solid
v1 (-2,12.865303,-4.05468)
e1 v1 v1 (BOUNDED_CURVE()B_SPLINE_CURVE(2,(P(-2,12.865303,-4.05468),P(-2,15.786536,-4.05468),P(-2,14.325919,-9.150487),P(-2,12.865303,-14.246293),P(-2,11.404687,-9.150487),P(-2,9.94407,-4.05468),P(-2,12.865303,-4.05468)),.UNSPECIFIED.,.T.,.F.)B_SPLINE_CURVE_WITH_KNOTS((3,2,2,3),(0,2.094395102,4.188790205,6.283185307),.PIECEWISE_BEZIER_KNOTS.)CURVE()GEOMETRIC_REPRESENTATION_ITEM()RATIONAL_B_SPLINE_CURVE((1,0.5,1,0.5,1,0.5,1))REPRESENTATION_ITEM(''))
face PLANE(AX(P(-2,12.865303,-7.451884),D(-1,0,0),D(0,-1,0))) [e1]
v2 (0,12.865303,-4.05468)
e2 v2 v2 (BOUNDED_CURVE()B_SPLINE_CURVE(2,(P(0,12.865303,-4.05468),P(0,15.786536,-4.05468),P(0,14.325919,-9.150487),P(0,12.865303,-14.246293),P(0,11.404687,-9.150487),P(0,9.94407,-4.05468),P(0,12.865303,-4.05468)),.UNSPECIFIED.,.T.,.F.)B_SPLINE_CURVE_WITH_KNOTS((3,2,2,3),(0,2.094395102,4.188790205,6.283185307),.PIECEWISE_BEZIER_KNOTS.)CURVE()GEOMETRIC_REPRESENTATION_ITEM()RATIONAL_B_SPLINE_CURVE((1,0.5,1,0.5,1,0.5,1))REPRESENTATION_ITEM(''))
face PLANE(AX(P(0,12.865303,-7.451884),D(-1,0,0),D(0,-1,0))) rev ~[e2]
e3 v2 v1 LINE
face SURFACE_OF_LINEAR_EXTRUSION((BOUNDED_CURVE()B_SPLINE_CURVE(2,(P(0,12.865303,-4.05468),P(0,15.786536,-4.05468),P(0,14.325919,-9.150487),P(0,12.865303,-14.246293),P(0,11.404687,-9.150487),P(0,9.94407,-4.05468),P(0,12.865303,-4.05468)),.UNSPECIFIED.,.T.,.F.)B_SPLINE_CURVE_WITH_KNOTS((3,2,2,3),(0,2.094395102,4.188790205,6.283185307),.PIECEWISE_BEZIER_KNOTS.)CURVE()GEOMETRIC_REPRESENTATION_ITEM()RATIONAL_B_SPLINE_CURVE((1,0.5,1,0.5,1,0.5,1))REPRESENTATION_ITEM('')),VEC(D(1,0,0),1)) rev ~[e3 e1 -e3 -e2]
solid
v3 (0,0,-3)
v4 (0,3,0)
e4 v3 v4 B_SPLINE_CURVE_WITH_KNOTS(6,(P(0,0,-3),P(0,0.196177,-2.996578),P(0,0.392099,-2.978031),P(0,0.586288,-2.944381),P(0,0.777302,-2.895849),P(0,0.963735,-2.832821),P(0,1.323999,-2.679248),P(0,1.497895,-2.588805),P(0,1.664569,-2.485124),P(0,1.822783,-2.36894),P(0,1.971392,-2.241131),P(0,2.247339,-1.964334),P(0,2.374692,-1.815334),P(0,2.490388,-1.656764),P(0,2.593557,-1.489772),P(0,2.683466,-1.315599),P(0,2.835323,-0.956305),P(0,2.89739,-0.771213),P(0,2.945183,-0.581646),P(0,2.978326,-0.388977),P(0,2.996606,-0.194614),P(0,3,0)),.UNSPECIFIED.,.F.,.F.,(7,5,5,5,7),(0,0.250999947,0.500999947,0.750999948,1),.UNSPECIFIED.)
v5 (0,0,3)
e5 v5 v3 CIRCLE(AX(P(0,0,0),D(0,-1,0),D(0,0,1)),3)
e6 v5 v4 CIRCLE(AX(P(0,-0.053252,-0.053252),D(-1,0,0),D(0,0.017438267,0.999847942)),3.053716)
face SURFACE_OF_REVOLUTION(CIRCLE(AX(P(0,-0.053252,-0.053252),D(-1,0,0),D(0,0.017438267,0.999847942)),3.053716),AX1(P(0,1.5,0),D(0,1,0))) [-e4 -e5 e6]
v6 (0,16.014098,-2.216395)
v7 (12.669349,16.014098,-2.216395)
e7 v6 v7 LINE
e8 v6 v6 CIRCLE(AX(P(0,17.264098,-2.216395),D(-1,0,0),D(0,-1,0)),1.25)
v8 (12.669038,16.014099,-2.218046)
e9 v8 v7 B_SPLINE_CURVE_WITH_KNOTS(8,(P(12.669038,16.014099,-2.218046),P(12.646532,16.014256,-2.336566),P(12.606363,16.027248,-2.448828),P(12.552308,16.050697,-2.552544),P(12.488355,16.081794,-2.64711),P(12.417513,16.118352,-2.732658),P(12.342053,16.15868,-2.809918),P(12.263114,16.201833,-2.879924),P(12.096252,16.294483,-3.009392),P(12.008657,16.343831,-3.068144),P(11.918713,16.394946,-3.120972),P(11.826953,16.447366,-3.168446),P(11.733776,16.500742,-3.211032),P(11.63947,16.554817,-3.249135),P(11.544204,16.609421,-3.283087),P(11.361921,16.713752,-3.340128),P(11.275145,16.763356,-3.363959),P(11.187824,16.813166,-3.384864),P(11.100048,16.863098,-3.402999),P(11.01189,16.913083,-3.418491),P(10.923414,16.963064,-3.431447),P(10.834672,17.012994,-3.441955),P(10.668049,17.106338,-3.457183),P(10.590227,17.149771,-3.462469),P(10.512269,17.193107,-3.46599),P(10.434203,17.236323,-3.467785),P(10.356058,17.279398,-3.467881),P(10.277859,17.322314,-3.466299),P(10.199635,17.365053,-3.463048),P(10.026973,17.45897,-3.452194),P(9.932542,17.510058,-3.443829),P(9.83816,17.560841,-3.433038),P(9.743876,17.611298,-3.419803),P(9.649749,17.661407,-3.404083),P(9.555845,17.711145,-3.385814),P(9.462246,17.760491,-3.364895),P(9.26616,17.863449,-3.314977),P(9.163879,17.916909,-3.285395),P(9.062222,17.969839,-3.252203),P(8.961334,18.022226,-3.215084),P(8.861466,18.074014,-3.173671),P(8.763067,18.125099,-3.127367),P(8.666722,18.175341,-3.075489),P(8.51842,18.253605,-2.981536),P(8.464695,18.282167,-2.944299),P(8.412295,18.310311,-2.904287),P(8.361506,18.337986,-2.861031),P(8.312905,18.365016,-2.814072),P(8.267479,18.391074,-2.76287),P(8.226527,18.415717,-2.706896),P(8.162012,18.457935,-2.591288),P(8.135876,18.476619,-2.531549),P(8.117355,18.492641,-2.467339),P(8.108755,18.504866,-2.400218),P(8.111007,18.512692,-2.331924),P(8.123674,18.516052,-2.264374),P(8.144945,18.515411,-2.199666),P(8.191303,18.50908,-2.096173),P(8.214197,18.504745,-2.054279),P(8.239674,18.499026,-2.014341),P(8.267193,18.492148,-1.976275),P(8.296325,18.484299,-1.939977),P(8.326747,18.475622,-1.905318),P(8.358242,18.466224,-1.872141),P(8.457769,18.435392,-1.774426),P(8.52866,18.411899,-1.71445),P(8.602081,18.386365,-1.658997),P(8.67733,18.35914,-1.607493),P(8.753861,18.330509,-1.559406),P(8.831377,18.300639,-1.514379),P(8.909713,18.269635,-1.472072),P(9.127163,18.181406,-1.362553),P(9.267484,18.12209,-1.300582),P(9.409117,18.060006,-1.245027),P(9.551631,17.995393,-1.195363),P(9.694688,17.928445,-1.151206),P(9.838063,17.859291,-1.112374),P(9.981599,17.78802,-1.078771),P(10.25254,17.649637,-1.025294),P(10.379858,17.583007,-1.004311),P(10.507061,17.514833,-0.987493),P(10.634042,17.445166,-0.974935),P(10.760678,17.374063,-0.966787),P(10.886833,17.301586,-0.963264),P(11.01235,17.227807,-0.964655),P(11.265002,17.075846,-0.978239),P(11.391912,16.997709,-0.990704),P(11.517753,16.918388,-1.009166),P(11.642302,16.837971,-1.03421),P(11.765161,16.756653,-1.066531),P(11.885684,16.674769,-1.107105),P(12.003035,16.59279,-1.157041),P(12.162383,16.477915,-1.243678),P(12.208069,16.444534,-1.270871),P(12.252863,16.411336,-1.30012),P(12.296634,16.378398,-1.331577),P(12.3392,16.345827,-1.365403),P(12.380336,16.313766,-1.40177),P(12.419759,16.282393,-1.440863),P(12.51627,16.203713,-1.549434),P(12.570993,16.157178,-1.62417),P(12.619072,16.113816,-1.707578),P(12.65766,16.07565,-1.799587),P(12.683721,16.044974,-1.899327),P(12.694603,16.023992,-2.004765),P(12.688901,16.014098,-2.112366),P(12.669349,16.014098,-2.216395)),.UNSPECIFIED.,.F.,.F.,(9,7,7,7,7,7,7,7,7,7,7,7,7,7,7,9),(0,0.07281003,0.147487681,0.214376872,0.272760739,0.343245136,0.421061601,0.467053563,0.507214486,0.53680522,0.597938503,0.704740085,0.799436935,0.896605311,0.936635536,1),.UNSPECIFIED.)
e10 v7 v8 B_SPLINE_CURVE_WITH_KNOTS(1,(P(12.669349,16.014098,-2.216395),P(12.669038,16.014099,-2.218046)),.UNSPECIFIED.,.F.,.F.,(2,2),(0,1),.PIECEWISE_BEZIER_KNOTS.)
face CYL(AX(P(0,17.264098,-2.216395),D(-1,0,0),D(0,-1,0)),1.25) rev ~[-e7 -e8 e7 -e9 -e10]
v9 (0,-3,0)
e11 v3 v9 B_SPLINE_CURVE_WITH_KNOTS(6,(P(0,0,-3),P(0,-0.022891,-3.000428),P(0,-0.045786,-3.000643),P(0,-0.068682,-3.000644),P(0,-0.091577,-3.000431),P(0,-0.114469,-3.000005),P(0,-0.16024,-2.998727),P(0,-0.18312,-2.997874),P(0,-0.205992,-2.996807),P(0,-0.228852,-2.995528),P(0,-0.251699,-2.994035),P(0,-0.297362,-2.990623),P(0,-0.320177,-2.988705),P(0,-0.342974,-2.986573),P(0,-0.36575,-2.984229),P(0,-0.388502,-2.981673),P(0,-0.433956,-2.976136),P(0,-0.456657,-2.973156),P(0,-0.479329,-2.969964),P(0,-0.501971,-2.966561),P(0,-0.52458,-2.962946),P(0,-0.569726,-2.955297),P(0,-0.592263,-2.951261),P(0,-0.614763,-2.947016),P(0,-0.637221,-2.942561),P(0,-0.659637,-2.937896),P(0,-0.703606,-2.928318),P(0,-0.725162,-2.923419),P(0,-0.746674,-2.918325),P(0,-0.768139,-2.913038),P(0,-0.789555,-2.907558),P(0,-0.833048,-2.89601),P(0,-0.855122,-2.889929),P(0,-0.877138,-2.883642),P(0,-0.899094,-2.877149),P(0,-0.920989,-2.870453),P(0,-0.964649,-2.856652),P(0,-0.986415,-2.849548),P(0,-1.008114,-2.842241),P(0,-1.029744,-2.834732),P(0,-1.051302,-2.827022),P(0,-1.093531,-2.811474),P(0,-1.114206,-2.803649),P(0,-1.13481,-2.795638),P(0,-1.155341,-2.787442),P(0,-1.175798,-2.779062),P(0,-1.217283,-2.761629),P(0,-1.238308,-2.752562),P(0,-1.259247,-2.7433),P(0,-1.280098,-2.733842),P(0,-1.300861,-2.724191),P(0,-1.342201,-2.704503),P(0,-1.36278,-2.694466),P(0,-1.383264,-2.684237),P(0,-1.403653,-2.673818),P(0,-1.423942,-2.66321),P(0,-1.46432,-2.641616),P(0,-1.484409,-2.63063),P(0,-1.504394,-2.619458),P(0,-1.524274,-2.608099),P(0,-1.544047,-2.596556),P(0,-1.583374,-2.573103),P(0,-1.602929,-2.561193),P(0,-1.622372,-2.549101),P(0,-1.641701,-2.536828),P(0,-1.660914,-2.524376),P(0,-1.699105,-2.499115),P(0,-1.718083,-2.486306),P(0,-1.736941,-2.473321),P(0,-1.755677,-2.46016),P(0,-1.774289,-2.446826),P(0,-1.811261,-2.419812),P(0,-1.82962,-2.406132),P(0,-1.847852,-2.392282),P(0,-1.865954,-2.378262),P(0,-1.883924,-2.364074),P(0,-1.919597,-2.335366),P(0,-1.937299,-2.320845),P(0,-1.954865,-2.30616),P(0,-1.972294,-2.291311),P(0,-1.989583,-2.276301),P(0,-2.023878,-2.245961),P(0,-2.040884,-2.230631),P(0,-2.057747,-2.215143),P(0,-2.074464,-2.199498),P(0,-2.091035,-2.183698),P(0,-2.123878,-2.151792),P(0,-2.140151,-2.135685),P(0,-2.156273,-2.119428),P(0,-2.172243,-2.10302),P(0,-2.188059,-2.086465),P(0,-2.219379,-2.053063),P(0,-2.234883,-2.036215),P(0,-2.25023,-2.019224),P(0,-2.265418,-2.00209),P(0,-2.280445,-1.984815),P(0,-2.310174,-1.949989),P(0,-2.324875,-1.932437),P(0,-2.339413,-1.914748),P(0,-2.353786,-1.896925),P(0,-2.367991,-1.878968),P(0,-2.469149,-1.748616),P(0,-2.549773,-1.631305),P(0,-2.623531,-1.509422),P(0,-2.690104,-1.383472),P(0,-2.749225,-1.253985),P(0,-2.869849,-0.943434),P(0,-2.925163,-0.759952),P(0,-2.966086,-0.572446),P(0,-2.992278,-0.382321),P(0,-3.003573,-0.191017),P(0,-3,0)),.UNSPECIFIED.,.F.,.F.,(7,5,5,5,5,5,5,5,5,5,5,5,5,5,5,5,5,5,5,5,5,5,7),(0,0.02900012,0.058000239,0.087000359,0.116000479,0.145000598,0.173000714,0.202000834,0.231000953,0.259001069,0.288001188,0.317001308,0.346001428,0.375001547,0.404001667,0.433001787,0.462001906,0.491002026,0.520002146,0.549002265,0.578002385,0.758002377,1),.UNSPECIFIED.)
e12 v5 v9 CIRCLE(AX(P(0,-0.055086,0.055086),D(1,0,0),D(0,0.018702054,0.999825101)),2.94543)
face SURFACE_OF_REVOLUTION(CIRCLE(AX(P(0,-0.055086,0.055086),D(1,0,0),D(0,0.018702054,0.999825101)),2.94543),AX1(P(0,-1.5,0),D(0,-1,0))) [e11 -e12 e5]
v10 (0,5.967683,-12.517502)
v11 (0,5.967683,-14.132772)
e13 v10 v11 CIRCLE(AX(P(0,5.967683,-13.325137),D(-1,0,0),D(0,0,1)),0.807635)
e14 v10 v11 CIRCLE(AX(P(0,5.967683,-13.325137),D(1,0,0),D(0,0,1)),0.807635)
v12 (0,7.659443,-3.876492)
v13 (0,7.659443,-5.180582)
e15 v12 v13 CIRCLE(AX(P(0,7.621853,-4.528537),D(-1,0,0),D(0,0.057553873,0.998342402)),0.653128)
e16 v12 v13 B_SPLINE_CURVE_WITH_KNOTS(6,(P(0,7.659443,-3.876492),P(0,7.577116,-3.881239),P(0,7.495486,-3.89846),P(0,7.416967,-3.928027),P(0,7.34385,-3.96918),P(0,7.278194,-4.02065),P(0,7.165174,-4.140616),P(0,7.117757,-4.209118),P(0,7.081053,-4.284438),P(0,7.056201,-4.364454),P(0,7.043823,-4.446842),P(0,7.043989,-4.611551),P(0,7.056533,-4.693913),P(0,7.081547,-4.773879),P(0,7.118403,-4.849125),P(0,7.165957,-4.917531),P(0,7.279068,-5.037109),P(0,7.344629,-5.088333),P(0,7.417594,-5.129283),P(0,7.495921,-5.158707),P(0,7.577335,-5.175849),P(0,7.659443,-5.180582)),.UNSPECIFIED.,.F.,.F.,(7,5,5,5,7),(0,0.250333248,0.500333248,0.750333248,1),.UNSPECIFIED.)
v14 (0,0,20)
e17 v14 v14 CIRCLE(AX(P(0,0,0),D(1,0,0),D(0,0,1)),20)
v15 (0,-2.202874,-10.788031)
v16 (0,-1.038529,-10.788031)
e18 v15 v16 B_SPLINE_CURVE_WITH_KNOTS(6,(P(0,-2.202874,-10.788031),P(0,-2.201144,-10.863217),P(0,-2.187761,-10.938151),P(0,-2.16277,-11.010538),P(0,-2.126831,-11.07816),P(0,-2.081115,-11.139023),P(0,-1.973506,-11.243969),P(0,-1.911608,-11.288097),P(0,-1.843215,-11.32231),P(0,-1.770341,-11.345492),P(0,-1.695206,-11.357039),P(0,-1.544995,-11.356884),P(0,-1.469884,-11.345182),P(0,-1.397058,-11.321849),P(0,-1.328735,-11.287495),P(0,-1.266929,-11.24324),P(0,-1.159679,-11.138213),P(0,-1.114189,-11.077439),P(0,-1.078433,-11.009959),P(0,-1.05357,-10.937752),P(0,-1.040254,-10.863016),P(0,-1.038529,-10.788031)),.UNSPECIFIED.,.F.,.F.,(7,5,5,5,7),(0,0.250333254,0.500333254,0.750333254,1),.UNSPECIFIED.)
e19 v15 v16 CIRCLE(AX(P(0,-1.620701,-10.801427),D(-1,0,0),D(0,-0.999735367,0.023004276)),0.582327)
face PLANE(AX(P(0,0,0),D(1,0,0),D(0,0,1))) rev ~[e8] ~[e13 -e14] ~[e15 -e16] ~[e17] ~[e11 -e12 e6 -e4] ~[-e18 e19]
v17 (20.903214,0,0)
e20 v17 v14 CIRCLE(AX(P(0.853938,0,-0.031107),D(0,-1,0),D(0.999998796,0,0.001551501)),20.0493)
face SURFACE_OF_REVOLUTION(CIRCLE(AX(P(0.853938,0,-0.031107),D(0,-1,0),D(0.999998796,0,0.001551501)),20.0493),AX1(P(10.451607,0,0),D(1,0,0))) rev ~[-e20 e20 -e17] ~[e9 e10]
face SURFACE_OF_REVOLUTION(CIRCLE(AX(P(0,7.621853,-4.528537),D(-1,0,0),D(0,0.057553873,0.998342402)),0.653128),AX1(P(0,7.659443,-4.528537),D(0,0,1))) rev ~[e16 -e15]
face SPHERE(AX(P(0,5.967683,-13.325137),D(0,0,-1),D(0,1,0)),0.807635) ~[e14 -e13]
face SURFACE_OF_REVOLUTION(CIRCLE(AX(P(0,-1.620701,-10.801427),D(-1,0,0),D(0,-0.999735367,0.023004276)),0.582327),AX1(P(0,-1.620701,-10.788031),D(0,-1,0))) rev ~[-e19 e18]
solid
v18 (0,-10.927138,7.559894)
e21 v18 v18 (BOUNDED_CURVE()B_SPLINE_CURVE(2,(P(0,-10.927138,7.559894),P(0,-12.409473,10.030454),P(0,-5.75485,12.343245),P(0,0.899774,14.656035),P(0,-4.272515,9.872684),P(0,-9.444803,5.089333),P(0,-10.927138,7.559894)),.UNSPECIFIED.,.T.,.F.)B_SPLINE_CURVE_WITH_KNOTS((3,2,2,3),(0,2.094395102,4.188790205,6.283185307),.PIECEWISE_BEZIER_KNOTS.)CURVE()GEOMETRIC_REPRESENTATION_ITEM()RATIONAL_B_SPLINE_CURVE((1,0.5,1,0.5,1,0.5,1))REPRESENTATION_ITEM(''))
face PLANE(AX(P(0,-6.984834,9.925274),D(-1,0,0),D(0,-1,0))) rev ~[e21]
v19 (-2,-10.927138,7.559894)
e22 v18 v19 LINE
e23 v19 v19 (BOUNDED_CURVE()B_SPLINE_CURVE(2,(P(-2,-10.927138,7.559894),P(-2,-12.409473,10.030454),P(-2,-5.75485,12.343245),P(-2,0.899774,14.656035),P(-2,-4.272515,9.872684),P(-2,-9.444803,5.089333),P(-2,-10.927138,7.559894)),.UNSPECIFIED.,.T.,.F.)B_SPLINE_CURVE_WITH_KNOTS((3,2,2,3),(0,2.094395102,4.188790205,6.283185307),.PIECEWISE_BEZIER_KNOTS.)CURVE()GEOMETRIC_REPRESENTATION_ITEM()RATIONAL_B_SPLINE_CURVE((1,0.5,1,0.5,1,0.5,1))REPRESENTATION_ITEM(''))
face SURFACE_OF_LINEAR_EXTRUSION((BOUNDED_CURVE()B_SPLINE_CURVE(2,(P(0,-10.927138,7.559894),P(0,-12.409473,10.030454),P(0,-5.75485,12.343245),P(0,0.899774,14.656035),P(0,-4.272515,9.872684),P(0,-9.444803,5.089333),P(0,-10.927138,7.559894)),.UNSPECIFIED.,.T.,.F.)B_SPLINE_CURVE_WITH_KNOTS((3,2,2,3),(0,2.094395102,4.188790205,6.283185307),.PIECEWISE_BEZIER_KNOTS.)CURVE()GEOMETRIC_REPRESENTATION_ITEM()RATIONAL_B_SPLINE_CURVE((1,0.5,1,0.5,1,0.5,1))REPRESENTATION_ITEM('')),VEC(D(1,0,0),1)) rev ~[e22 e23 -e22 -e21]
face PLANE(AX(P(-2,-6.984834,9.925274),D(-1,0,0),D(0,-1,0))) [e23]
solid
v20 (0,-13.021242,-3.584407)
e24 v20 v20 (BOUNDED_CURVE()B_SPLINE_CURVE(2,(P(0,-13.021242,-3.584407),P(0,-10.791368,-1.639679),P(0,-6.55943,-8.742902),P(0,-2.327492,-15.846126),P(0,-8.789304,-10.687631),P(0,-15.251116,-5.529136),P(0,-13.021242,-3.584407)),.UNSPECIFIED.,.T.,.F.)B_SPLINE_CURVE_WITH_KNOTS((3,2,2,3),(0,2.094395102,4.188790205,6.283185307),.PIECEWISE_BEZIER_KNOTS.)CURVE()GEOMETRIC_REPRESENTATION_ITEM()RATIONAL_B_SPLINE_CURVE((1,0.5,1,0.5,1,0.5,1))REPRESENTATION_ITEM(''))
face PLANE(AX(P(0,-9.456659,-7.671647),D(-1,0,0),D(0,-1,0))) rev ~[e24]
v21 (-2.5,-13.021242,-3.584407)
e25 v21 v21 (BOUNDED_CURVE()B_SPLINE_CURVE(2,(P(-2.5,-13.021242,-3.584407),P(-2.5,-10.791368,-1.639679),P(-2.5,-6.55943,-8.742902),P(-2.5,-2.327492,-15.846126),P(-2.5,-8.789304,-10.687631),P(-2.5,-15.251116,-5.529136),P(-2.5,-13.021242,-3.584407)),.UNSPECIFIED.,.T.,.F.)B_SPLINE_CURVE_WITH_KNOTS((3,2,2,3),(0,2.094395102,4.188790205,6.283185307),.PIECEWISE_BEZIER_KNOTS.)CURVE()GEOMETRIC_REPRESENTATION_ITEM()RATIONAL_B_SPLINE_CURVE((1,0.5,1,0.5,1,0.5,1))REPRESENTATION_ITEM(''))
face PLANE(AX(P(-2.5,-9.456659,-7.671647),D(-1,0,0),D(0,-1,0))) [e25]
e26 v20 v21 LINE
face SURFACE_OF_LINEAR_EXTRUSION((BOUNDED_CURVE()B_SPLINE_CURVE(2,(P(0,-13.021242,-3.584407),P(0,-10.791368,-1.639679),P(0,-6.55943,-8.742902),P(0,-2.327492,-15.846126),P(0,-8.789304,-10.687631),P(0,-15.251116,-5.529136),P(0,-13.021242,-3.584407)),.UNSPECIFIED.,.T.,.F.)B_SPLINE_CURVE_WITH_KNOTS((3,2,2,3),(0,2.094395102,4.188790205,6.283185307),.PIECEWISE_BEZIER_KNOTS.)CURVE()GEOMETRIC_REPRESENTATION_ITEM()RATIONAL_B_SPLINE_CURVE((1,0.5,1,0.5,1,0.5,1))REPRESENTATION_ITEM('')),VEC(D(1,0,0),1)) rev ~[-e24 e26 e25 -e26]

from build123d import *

# Parameters (mm, degrees)
F7_DEPTH  = 2.5
F13_DEPTH = 2
F25_DEPTH = 2
F30_R     = 0.6074168768
F31_DEPTH = 20
F32_R     = 1.25
F33_DEPTH = 25


# Not quite as in the source:
# - ends of sketch curves that miss each other by under 0.0002 mm in the source are joined
# - the program builds the solid bodies; features that only make, move or delete a surface that nothing else refers to are left out


with BuildPart() as f1:
    # F0 (on Front) → F1 (revolve)
    with BuildSketch(Plane.XZ):
        with BuildLine():
            Line((0, 20), (0, 0))
            Line((0, 0), (20.9032140208, 0))
            ThreePointArc((20.9032140208, 0), (14.7145025663, 14.4554109076), (0, 20))
        make_face()
    revolve(axis=Axis((10.4516070104, 0, 0), (1, 0, 0)))

    # F2 (on Right) → F3 (revolve)
    with BuildSketch(Plane.YZ):
        with BuildLine():
            Line((-3, 0), (0, 0))
            Line((0, 0), (0, 3))
            ThreePointArc((0, 3), (-2.1378188048, 2.1378188048), (-3, 0))
        make_face()
    revolve(axis=Axis((0, -1.5, 0), (0, -1, 0)))

    # F4 (on face) → F5 (revolve)
    with BuildSketch(Plane(origin=(0, 0, 0), x_dir=(0, -1, 0), z_dir=(-1, 0, 0))):
        with BuildLine():
            Line((-3, 0), (0, 0))
            Line((0, 0), (0, 3))
            ThreePointArc((0, 3), (-2.1060516761, 2.1060516761), (-3, 0))
        make_face()
    revolve(axis=Axis((0, 1.5, 0), (0, 1, 0)))

    # F20 (on face) → F21 (revolve)
    with BuildSketch(Plane(origin=(0, 0, 0), x_dir=(0, -1, 0), z_dir=(-1, 0, 0))):
        with BuildLine():
            ThreePointArc((-7.6594431885, -3.8764923811), (-8.2749807984, -4.5285373926), (-7.6594431885, -5.1805824041))
            Line((-7.6594431885, -5.1805824041), (-7.6594431885, -3.8764923811))
        make_face()
    revolve(axis=Axis((0, 7.6594431885, -4.5285373926), (0, 0, 1)))

    # F22 (on face) → F23 (revolve)
    with BuildSketch(Plane(origin=(0, 0, 0), x_dir=(0, -1, 0), z_dir=(-1, 0, 0))):
        with BuildLine():
            ThreePointArc((-5.9676826932, -12.5175017115), (-6.7753176022, -13.3251366206), (-5.9676826932, -14.1327715296))
            Line((-5.9676826932, -14.1327715296), (-5.9676826932, -12.5175017115))
        make_face()
    revolve(axis=Axis((0, 5.9676826932, -13.3251366206), (0, 0, 1)))

    # F28 (on face) → F29 (revolve)
    with BuildSketch(Plane(origin=(0, 0, 0), x_dir=(0, -1, 0), z_dir=(-1, 0, 0))):
        with BuildLine():
            ThreePointArc((2.2028738167, -10.7880309224), (1.6207013978, -10.2191004003), (1.0385289788, -10.7880309224))
            Line((1.0385289788, -10.7880309224), (2.2028738167, -10.7880309224))
        make_face()
    revolve(axis=Axis((0, -1.6207013978, -10.7880309224), (0, -1, 0)))

    # F30 (on face) → F31 (cut)
    with BuildSketch(Plane(origin=(0, 0, 0), x_dir=(0, -1, 0), z_dir=(-1, 0, 0))):
        with Locations((2.1903119247, -18.6780034797)):
            Circle(F30_R)
    extrude(amount=F31_DEPTH, mode=Mode.SUBTRACT)

    # F32 (on face) → F33 (cut)
    with BuildSketch(Plane(origin=(0, 0, 0), x_dir=(0, -1, 0), z_dir=(-1, 0, 0))):
        with Locations((-17.264097929, -2.2163949907)):
            Circle(F32_R)
    extrude(amount=-F33_DEPTH, mode=Mode.SUBTRACT)


with BuildPart() as f7:
    # F6 (on face) → F7 (new body)
    with BuildSketch(Plane(origin=(0, 0, 0), x_dir=(0, -1, 0), z_dir=(-1, 0, 0))):
        with BuildLine():
            add(Edge.make_bspline(
                [(13.0212418735, -3.58440727), (10.7913677509, -1.6396786361), (6.5594301058, -8.7429022088), (2.3274924606, -15.8461257815), (8.7893042283, -10.6876308427), (15.2511159961, -5.5291359038), (13.0212418735, -3.58440727)],
                knots=[0, 0, 0, 2.0943951024, 2.0943951024, 4.1887902048, 4.1887902048, 6.2831853072, 6.2831853072, 6.2831853072], degree=2, weights=[1, 0.5, 1, 0.5, 1, 0.5, 1]))
        make_face()
    extrude(amount=F7_DEPTH)


with BuildPart() as f13:
    # F12 (on face) → F13 (new body)
    with BuildSketch(Plane(origin=(0, 0, 0), x_dir=(0, -1, 0), z_dir=(-1, 0, 0))):
        with BuildLine():
            add(Edge.make_bspline(
                [(10.9271379188, 7.5598936528), (12.4094731309, 10.030454188), (5.7548497871, 12.3432447088), (-0.8997735567, 14.6560352296), (4.2725145749, 9.8726841736), (9.4448027066, 5.0893331176), (10.9271379188, 7.5598936528)],
                knots=[0, 0, 0, 2.0943951024, 2.0943951024, 4.1887902048, 4.1887902048, 6.2831853072, 6.2831853072, 6.2831853072], degree=2, weights=[1, 0.5, 1, 0.5, 1, 0.5, 1]))
        make_face()
    extrude(amount=F13_DEPTH)


with BuildPart() as f25:
    # F24 (on face) → F25 (new body)
    with BuildSketch(Plane(origin=(0, 0, 0), x_dir=(0, -1, 0), z_dir=(-1, 0, 0))):
        with BuildLine():
            add(Edge.make_bspline(
                [(-12.8653030843, -4.054680001), (-15.7865357239, -4.054680001), (-14.3259194041, -9.1504866723), (-12.8653030843, -14.2462933436), (-11.4046867644, -9.1504866723), (-9.9440704446, -4.054680001), (-12.8653030843, -4.054680001)],
                knots=[0, 0, 0, 2.0943951024, 2.0943951024, 4.1887902048, 4.1887902048, 6.2831853072, 6.2831853072, 6.2831853072], degree=2, weights=[1, 0.5, 1, 0.5, 1, 0.5, 1]))
        make_face()
    extrude(amount=F25_DEPTH)


solid = Compound([f1.part, f7.part, f13.part, f25.part])
